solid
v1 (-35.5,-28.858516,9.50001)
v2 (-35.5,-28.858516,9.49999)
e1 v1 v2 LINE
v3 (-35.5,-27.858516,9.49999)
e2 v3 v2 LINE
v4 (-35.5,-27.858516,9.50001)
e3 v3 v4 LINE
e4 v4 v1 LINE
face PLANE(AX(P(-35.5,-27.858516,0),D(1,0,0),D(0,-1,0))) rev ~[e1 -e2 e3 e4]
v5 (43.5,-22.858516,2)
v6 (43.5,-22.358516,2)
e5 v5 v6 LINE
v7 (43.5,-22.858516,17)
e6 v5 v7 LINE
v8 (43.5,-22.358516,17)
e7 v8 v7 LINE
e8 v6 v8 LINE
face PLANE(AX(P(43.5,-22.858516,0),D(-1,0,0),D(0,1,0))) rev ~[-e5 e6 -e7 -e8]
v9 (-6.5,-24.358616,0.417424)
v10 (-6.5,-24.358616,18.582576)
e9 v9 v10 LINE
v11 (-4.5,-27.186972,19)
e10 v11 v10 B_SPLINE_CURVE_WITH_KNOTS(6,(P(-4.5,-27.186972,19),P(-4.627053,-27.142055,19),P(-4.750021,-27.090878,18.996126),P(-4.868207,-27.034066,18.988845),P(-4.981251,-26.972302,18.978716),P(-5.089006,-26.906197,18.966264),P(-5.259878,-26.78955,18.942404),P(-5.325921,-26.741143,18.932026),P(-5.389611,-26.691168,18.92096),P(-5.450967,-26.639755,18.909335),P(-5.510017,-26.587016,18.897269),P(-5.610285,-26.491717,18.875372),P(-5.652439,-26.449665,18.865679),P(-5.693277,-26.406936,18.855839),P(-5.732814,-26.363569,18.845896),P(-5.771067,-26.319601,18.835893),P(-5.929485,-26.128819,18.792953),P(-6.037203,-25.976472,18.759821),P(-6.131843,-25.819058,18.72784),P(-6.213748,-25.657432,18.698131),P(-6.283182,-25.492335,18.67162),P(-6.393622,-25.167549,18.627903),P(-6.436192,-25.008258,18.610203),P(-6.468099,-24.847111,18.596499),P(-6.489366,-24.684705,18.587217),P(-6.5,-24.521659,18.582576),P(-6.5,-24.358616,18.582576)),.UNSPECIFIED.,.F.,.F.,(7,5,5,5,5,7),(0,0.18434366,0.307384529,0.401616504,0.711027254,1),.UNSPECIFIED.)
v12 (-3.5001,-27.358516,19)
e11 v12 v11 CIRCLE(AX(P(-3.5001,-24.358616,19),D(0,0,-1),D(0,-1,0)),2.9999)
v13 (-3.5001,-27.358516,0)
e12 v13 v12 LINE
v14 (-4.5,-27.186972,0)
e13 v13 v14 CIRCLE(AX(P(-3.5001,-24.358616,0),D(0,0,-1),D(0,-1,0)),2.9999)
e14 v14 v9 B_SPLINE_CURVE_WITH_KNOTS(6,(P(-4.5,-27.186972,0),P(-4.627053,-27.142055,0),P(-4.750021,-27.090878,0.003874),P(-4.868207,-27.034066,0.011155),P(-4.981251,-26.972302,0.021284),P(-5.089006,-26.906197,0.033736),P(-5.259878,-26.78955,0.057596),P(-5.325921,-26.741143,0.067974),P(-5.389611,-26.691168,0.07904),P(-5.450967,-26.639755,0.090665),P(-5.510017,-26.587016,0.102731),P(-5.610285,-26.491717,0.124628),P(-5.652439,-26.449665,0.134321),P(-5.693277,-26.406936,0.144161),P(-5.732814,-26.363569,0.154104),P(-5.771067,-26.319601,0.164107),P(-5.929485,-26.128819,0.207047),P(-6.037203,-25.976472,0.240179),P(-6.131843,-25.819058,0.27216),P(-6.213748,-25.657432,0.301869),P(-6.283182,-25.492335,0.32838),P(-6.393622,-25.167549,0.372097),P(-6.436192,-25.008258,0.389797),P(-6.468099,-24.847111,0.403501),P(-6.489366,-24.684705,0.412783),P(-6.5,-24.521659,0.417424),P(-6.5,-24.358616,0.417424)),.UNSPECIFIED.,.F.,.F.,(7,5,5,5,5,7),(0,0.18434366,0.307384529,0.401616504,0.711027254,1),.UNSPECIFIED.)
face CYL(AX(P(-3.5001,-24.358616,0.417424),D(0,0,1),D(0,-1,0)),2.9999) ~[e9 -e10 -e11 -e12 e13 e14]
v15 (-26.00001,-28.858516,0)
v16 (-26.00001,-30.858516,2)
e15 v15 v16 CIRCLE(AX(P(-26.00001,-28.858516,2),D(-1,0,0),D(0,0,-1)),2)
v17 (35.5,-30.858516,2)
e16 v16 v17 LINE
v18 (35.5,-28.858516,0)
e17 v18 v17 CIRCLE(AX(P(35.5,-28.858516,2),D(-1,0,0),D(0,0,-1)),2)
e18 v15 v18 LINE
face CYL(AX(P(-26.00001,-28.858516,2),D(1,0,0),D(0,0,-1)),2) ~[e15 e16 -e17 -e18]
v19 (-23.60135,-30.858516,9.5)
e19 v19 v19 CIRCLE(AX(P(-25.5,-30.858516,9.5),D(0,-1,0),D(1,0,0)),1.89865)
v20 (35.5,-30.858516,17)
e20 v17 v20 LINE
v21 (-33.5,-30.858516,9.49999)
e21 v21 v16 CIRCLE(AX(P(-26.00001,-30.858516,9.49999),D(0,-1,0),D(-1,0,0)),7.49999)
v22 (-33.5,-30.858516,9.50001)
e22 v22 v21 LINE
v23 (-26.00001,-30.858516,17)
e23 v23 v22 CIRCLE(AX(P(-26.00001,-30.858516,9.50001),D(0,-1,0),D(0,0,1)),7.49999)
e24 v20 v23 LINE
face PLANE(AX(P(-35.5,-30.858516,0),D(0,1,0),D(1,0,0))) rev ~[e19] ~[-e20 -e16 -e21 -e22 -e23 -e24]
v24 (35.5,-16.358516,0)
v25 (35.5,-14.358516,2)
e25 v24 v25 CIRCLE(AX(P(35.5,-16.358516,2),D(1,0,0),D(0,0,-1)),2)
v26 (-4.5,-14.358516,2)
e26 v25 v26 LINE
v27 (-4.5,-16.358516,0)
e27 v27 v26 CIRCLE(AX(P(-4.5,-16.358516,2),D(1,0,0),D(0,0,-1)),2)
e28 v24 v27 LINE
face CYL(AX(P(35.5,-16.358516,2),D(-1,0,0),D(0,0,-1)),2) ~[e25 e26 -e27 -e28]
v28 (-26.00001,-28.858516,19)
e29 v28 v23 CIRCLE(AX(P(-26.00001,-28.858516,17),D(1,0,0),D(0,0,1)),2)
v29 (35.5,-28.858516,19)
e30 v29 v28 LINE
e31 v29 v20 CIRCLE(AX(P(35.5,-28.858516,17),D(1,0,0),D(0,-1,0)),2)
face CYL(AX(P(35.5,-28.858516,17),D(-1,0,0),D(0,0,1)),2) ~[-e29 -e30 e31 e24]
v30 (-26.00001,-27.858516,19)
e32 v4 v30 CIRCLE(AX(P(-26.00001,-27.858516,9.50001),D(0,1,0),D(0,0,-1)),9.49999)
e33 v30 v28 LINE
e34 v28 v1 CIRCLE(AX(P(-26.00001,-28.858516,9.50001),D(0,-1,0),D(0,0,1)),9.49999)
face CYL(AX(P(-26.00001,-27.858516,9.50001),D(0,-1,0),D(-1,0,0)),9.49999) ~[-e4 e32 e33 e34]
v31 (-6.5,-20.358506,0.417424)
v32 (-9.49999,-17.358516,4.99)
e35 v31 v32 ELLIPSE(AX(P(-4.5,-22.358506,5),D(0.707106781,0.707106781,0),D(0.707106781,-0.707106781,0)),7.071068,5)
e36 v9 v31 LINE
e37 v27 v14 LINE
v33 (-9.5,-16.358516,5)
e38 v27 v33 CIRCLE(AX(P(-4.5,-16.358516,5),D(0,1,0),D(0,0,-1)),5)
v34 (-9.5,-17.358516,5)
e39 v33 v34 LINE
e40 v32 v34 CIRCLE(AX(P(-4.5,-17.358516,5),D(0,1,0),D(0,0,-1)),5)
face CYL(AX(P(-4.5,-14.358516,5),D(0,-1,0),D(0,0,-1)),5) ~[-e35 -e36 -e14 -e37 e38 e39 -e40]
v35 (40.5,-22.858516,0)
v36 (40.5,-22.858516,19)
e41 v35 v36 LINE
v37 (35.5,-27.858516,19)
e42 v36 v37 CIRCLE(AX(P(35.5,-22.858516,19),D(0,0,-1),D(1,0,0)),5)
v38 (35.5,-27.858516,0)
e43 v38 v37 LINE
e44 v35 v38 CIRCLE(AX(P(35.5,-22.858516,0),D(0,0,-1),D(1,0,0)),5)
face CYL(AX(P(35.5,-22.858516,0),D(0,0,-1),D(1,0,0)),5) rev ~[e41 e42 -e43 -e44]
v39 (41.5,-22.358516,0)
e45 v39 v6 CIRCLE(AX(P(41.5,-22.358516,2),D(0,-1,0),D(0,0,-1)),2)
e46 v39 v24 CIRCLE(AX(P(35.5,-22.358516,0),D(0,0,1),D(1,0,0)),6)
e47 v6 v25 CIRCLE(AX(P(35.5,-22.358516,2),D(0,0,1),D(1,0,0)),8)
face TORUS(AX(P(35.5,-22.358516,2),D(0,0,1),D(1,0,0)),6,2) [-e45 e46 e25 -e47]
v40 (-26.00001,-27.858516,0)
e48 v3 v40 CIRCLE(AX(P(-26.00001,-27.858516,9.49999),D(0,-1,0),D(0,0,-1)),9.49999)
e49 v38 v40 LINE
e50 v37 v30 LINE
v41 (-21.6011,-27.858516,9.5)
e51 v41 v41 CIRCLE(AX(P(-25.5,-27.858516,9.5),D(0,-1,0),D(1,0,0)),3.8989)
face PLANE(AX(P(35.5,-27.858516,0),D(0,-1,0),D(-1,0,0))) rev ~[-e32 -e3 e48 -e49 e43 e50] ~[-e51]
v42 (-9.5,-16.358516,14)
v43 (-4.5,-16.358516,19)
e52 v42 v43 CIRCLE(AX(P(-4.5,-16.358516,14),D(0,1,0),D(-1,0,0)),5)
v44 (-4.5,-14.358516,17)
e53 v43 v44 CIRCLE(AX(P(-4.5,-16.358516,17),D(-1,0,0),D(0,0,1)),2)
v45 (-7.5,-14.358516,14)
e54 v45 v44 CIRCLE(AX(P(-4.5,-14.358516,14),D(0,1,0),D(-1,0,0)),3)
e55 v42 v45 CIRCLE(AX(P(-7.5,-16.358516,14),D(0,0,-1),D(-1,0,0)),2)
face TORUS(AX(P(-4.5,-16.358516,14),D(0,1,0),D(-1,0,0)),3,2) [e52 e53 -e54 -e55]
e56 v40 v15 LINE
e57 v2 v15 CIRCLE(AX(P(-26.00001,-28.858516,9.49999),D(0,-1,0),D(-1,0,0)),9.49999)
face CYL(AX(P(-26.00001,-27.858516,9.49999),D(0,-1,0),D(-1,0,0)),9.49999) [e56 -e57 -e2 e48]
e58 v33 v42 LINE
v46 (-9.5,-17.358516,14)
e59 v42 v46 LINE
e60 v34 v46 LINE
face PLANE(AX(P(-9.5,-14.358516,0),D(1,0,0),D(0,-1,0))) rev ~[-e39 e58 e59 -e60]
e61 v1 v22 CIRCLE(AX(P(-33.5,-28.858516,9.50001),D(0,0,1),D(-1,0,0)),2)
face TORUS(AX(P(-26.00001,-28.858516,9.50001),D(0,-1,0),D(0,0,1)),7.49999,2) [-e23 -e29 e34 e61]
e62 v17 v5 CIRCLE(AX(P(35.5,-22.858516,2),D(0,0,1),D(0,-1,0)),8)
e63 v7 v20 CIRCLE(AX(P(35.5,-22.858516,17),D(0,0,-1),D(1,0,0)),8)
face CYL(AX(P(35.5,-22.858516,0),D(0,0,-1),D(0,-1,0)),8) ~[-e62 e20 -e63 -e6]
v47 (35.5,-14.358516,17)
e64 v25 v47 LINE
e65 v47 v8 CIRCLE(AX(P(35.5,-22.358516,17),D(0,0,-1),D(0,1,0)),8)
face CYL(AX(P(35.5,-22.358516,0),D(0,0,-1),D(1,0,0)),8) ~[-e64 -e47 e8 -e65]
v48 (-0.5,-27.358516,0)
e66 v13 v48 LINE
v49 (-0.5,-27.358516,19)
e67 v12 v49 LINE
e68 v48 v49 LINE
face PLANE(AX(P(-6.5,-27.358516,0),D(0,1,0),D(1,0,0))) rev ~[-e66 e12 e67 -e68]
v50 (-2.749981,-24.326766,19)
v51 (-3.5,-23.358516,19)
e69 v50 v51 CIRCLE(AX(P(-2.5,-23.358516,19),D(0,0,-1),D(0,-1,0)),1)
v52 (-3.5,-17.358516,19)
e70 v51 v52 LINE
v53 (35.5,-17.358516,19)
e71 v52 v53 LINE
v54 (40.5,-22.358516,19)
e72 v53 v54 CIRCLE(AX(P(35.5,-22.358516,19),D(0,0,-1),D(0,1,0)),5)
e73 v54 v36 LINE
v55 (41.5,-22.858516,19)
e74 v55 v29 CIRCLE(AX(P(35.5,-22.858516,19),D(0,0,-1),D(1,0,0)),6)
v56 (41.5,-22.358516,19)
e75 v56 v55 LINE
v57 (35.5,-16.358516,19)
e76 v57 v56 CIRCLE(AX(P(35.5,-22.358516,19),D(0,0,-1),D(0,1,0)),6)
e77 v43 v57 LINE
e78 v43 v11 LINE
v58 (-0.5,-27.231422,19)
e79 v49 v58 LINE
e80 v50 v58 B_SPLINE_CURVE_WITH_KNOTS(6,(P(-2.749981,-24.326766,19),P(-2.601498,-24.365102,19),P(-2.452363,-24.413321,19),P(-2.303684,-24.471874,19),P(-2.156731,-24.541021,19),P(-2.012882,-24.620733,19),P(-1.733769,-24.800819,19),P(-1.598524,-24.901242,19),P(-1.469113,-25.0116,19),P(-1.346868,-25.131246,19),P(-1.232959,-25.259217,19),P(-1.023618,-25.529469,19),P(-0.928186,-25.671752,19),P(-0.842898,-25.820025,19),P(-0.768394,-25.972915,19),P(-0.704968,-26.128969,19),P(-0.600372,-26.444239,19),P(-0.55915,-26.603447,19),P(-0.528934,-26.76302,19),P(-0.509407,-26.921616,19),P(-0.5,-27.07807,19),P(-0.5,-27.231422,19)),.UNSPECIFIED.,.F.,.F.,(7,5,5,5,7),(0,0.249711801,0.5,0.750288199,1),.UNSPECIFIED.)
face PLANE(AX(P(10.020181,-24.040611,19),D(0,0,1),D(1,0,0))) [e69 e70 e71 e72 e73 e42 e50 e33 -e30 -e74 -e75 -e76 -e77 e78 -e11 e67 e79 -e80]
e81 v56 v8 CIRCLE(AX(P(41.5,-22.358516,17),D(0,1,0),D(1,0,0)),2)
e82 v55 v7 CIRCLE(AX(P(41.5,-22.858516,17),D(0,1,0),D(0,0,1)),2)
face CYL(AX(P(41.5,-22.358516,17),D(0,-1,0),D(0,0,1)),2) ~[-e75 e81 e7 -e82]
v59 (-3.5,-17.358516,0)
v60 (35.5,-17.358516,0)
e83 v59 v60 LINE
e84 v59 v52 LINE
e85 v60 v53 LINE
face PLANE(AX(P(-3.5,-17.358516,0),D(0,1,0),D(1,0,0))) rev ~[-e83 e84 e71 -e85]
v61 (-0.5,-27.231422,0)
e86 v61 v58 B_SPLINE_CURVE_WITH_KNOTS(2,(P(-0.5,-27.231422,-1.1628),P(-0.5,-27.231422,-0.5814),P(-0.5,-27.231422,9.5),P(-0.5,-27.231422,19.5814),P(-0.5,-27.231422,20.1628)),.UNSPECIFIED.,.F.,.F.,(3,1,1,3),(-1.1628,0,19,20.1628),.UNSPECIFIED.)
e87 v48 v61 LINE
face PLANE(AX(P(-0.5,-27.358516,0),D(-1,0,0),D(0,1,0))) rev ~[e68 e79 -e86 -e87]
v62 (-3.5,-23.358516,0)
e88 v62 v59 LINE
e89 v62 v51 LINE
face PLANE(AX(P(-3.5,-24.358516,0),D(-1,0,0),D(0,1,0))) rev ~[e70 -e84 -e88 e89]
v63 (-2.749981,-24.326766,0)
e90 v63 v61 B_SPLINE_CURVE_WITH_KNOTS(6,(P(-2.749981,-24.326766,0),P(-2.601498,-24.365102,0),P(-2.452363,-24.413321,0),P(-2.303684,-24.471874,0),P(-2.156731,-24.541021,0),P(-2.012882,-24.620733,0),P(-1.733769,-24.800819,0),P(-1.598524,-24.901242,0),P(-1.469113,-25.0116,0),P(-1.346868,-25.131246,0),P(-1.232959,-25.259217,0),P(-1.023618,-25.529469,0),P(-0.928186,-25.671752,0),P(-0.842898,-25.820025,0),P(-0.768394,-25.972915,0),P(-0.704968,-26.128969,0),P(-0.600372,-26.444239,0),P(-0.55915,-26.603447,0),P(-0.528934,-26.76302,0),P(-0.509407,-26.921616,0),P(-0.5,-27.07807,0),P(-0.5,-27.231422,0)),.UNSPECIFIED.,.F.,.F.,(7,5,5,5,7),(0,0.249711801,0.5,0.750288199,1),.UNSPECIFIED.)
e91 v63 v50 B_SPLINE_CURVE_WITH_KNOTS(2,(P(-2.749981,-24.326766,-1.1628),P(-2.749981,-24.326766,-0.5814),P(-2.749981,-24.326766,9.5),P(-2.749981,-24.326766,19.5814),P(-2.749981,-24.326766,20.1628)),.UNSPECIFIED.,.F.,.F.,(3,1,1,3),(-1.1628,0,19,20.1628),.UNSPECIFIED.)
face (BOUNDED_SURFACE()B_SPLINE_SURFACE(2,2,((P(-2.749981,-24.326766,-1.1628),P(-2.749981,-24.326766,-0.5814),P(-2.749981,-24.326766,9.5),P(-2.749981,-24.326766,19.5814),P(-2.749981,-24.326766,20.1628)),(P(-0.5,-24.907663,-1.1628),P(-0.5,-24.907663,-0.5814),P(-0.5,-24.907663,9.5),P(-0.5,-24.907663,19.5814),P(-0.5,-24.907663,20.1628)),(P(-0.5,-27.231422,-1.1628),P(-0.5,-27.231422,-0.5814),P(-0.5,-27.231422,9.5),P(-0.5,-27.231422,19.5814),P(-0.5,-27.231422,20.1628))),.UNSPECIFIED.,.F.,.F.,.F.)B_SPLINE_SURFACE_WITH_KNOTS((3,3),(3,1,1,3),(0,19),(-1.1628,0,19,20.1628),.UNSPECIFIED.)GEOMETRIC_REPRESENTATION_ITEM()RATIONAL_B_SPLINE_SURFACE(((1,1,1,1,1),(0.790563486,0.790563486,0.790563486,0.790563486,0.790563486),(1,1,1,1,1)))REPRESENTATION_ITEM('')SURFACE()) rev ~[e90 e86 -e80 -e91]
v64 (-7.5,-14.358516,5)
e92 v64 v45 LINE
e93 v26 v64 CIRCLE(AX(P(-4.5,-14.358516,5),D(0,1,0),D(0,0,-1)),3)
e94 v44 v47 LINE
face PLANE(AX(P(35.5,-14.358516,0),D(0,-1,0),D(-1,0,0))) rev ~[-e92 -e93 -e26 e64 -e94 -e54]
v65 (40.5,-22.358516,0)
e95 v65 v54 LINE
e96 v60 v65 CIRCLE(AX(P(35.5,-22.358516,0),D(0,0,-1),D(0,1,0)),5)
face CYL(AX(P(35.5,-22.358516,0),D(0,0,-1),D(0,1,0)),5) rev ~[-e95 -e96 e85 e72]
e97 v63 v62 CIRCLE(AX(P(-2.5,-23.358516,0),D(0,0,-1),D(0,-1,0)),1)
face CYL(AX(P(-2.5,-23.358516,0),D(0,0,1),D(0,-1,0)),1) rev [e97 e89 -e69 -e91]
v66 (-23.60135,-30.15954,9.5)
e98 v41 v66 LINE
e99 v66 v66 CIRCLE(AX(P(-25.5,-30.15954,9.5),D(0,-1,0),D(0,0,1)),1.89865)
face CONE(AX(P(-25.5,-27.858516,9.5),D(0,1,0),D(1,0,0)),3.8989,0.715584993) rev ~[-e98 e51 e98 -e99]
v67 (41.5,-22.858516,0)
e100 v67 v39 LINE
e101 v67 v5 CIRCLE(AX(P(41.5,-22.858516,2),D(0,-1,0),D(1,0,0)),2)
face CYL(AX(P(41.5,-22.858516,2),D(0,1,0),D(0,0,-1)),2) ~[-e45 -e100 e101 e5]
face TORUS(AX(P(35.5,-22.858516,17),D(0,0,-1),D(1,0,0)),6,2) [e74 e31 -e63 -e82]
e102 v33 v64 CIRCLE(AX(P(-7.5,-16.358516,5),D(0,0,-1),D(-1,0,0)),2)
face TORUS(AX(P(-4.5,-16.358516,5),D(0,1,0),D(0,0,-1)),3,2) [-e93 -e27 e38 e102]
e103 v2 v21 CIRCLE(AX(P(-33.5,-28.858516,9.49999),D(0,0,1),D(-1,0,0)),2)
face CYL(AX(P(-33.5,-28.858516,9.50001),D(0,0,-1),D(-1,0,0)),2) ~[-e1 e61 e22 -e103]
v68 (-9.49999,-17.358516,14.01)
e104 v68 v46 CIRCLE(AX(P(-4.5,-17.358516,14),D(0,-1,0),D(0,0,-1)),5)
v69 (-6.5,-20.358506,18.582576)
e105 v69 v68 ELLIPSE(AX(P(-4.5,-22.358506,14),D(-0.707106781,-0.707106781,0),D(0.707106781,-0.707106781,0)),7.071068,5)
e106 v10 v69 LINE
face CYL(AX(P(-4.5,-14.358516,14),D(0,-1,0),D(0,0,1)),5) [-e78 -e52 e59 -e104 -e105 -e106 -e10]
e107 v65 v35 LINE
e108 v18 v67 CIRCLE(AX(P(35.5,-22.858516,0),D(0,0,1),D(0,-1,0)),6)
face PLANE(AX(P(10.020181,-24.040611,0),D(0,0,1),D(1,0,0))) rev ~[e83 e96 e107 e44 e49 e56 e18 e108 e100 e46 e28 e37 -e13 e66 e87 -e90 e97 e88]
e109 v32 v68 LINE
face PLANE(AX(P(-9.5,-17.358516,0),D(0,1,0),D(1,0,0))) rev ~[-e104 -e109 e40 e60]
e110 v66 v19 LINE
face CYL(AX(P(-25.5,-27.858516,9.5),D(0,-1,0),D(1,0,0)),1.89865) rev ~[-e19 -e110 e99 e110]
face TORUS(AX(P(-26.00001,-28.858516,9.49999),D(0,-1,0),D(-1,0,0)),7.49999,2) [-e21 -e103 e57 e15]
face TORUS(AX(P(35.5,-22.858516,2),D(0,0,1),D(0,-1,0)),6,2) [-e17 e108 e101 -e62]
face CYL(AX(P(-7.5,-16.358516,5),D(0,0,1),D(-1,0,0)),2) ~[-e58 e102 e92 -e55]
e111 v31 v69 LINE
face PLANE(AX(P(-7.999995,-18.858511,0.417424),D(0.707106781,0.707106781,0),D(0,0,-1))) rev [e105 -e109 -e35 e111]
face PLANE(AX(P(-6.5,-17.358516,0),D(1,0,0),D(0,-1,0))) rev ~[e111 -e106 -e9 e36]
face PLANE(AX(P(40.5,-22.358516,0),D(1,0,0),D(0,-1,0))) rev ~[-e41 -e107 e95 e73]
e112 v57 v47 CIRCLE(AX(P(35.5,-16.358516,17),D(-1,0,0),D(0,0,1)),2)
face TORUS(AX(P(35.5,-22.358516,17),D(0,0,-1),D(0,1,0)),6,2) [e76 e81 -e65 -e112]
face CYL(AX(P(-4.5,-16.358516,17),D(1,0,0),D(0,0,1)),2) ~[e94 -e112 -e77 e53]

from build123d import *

# Parameters (mm, degrees)
F2_W            = 3
F2_H            = 3
F3_DEPTH        = 19
F5_R            = 9.49999
F6_R            = 5
F7_R            = 2
F8_R            = 1
F9_SIZE         = 2.99999
F10_D           = 3.7973
F10_CSINK_D     = 7.7978
F10_CSINK_ANGLE = 82
F11_R           = 2.9999


# Not quite as in the source:
# - a fillet or chamfer is up to 0.001 mm smaller than in the source, because OpenCascade refuses the exact size


with BuildPart() as f3:
    # F2 (on Top) → F3 (new body)
    with BuildSketch(Plane.XY):
        with BuildLine():
            Line((35.5, -27.8585158202), (-35.5, -27.8585158202))
            Line((-35.5, -27.8585158202), (-35.5, -30.8585158202))
            Line((-35.5, -30.8585158202), (35.5, -30.8585158202))
            ThreePointArc((35.5, -30.8585158202), (41.1568542495, -28.5153700696), (43.5, -22.8585158202))
            Line((43.5, -22.8585158202), (43.5, -22.3585158202))
            ThreePointArc((43.5, -22.3585158202), (41.1568542495, -16.7016615707), (35.5, -14.3585158202))
            Line((35.5, -14.3585158202), (-6.5, -14.3585158202))
            Line((-6.5, -14.3585158202), (-6.5, -16.3585158202))
            Line((-6.5, -16.3585158202), (-6.5, -17.3585158202))
            Line((-6.5, -17.3585158202), (-3.5, -17.3585158202))
            Line((-3.5, -17.3585158202), (35.5, -17.3585158202))
            ThreePointArc((35.5, -17.3585158202), (39.0355339059, -18.8229819142), (40.5, -22.3585158202))
            Line((40.5, -22.3585158202), (40.5, -22.8585158202))
            ThreePointArc((40.5, -22.8585158202), (39.0355339059, -26.3940497261), (35.5, -27.8585158202))
        make_face()
        with Locations((-2, -25.8585158202)):
            Rectangle(F2_W, F2_H)
        Polygon((-3.5, -24.3585158202), (-3.5, -17.3585158202), (-6.5, -17.3585158202), (-6.5, -27.3585158202), (-3.5, -27.3585158202), align=None)
        Polygon((-9.5, -17.3585158202), (-6.5, -17.3585158202), (-6.5, -16.3585158202), (-6.5, -14.3585158202), (-9.5, -14.3585158202), align=None)
    extrude(amount=F3_DEPTH)

    # F5 (radius 9.5 in the source; OpenCascade refuses exactly that, so slightly less here)
    f5_edges = [f3.edges().sort_by_distance(p)[0] for p in [
        (-35.5, -29.358516, 19),
        (-35.5, -29.358516, 0),
    ]]
    fillet(f5_edges, radius=F5_R)

    # F6
    f6_edges = [f3.edges().sort_by_distance(p)[0] for p in [
        (-9.5, -15.858516, 19),
        (-9.5, -15.858516, 0),
    ]]
    fillet(f6_edges, radius=F6_R)

    # F7
    f7_edges = [f3.edges().sort_by_distance(p)[0] for p in [
        (15.5, -14.358516, 0),
    ]]
    fillet(f7_edges, radius=F7_R)

    # F8
    f8_edges = [f3.edges().sort_by_distance(p)[0] for p in [
        (-3.5, -24.358516, 9.5),
    ]]
    fillet(f8_edges, radius=F8_R)

    # F9 (size 3 in the source; OpenCascade refuses exactly that, so slightly less here)
    f9_edges = [f3.edges().sort_by_distance(p)[0] for p in [
        (-6.5, -17.358516, 9.5),
    ]]
    chamfer(f9_edges, length=F9_SIZE)

    # F10 (through all)
    with Locations(Plane(origin=(0, -27.8585158202, 0), x_dir=(-1, 0, 0), z_dir=(0, 1, 0))):
        with Locations((25.5, 9.5)):
            CounterSinkHole(F10_D / 2, F10_CSINK_D / 2, counter_sink_angle=F10_CSINK_ANGLE)

    # F11 (radius 3 in the source; OpenCascade refuses exactly that, so slightly less here)
    f11_edges = [f3.edges().sort_by_distance(p)[0] for p in [
        (-0.5, -24.358516, 9.5),
        (-6.5, -27.358516, 9.5),
    ]]
    fillet(f11_edges, radius=F11_R)


solid = f3.part
